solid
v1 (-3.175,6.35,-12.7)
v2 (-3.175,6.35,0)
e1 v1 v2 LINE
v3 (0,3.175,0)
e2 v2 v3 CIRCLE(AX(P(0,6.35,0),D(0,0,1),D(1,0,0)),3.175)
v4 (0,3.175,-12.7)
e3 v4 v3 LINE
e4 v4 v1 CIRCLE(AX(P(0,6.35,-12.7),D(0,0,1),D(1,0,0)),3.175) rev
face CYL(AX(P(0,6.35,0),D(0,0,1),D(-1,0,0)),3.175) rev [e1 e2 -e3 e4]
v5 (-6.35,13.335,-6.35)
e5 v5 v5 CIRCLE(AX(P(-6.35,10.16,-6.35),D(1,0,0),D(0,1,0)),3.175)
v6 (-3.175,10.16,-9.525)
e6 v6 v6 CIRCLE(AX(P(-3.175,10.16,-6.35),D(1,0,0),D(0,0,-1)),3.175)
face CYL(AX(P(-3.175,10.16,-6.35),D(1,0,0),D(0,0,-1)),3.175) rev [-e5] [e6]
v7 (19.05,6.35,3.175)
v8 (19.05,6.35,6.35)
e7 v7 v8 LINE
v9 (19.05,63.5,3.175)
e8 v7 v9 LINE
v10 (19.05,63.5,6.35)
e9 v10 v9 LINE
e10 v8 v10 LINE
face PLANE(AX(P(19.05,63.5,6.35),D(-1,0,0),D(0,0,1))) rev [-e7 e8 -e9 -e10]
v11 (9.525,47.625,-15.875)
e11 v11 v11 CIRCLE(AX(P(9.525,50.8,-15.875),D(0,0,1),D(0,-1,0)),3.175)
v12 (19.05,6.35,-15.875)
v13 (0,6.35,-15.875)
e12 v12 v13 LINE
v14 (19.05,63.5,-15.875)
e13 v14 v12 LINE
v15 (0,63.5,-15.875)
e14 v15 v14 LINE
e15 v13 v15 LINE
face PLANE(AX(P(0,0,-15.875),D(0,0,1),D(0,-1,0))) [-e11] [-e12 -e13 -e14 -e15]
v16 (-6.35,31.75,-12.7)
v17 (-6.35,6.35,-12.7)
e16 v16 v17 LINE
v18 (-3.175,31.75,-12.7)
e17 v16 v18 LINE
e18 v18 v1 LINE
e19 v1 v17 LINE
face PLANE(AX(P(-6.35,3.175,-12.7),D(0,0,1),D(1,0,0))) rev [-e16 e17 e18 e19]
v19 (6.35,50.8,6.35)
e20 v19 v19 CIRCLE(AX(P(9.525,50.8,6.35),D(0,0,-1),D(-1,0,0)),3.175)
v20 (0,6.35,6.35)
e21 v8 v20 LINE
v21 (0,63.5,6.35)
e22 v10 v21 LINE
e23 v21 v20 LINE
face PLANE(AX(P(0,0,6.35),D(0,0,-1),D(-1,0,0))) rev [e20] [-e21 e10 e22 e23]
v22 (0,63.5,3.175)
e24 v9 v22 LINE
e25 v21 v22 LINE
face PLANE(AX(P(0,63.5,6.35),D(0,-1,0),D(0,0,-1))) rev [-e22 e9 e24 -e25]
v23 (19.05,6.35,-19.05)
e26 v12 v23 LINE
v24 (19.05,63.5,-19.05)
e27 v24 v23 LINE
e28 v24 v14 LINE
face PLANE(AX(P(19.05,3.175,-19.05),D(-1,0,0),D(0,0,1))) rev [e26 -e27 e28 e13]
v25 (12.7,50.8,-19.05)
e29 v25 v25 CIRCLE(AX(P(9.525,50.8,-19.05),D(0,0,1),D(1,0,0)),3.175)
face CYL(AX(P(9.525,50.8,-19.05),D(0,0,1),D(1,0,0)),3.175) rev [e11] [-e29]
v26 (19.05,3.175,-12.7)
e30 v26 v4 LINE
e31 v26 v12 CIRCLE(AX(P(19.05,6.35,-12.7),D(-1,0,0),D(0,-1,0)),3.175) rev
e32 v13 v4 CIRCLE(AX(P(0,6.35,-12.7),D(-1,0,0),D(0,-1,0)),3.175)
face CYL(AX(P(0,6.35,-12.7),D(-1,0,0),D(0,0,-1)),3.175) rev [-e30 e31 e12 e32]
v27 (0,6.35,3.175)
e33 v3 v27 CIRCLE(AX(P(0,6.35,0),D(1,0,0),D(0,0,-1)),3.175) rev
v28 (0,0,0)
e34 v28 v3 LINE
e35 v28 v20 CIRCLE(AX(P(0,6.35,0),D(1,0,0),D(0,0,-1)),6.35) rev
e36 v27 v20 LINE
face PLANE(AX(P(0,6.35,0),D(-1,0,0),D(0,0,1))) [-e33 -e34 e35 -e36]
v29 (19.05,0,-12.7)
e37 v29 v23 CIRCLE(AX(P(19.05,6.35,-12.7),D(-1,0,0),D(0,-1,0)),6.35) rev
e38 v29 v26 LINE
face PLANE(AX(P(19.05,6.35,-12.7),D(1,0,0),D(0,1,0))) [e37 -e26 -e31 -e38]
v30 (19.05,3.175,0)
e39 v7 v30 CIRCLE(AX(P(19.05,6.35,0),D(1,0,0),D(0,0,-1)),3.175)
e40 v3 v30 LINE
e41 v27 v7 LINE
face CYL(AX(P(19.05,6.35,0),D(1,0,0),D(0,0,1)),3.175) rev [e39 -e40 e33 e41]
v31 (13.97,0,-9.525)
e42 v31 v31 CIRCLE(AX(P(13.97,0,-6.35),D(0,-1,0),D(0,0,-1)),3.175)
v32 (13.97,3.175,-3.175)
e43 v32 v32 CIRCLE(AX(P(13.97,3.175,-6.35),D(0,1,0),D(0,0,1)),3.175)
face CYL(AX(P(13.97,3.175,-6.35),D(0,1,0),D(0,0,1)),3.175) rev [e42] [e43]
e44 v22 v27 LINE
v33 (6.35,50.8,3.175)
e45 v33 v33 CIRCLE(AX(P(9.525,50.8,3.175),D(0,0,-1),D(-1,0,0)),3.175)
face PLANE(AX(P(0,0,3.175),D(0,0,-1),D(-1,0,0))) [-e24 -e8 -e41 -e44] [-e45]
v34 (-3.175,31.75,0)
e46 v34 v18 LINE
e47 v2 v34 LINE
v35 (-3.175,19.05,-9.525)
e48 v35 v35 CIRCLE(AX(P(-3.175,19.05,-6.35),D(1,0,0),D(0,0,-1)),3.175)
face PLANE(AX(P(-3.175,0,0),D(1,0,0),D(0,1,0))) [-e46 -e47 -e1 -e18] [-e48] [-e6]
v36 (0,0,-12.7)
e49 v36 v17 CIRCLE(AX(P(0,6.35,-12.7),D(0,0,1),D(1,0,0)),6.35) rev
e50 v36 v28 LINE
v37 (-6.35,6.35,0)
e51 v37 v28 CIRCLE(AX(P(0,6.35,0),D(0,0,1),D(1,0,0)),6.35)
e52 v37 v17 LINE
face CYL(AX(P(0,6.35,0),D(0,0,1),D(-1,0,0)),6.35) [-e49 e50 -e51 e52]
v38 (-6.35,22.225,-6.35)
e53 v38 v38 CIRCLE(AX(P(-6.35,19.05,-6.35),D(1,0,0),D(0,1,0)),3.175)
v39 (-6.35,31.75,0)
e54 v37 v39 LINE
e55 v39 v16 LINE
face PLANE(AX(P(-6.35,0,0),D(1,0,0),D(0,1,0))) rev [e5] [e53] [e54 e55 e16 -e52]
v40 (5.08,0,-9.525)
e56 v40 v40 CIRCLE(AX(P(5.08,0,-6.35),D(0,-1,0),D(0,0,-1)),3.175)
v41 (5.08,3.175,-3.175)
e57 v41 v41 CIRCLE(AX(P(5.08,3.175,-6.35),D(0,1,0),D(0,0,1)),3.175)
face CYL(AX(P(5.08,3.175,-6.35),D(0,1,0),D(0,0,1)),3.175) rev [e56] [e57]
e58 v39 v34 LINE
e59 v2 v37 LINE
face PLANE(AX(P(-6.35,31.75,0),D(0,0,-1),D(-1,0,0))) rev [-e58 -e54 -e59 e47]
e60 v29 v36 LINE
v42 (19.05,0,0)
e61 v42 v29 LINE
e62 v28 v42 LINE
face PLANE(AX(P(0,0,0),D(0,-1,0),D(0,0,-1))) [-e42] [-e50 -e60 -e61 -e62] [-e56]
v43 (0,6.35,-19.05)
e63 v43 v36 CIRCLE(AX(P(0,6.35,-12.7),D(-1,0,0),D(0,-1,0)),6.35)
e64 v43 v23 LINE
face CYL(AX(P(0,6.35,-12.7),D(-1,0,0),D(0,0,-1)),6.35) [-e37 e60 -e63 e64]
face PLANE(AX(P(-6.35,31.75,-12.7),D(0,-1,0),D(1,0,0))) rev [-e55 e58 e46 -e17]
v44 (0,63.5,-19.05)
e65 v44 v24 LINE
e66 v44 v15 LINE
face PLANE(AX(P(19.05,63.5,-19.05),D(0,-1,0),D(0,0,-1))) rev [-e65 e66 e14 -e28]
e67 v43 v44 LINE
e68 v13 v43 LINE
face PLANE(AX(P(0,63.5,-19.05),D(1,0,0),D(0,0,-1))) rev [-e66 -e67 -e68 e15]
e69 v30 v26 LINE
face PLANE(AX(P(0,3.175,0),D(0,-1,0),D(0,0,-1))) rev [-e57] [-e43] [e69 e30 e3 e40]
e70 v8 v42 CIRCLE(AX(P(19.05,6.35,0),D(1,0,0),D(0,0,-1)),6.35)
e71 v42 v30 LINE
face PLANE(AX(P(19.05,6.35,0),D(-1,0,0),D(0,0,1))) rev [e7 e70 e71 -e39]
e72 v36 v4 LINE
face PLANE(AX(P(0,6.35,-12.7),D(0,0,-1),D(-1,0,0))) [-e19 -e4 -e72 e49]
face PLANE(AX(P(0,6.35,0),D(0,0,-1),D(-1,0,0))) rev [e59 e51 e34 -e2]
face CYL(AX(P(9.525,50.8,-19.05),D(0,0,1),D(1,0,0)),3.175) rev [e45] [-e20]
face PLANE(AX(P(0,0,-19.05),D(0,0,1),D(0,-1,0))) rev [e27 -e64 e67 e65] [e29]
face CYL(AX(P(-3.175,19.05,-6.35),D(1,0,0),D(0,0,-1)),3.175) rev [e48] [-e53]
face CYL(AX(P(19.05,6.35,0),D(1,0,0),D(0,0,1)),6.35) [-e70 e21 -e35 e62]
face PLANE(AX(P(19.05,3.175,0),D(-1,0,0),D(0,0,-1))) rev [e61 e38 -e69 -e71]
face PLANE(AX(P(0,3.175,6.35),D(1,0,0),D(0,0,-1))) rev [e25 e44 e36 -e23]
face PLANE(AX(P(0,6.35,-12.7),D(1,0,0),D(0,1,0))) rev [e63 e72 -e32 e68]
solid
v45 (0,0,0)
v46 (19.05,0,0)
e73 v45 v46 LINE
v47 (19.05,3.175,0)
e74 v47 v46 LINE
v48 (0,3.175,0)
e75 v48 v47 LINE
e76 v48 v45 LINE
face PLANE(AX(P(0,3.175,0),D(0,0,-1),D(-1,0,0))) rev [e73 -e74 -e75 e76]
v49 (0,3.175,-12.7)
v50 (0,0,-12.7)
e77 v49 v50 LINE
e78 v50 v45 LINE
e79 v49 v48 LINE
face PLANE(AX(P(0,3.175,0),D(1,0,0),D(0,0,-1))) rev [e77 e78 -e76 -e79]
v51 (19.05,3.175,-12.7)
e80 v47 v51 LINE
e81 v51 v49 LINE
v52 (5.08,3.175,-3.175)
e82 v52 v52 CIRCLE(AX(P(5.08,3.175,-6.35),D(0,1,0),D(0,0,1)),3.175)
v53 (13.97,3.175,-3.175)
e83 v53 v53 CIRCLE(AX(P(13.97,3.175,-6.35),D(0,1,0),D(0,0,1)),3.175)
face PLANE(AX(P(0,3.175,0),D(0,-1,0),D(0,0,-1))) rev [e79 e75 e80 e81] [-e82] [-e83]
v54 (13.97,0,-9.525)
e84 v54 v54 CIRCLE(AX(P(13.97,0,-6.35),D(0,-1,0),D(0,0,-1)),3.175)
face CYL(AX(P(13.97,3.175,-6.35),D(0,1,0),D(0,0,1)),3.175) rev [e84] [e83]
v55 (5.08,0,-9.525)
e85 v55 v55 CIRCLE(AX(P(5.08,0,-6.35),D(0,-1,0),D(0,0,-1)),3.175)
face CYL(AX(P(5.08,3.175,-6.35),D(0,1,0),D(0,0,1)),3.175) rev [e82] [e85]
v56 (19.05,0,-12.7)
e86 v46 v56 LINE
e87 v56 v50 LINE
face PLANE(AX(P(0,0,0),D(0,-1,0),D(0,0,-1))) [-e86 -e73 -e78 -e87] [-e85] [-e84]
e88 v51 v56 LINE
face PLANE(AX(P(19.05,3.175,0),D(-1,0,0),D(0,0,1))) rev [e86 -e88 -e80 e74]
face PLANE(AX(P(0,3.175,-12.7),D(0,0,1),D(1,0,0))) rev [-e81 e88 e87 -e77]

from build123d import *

# Parameters (mm, degrees)
SKETCH1_W                            = 19.05
SKETCH1_H                            = 12.7
BOSS_EXTRUDE1_DEPTH                  = 3.175
CONVERT_SOLID3_OUTLINE_W             = 3.175
CONVERT_SOLID3_OUTLINE_H             = 12.7
CONVERT_SOLID3_DEPTH                 = 19.05
EDGE_FLANGE1_DEPTH                   = 19.05
EDGE_FLANGE1_BEND_DEPTH              = 19.05
EDGE_FLANGE3_DEPTH                   = 12.7
CUT_EXTRUDE1_DEPTH                   = 71.995158286
CUT_EXTRUDE1_DEPTH_BACK              = 71.995158286
SKETCH23_R                           = 3.175
F_1_4_0_25_DIAMETER_HOLE1_AT_2_COUNT = 2
F_1_4_0_25_DIAMETER_HOLE1_AT_2_PITCH = 8.89
F_1_4_0_25_DIAMETER_HOLE2_AT_2_COUNT = 2
F_1_4_0_25_DIAMETER_HOLE2_AT_2_PITCH = 8.89


# Read off the part's stored shape, not the designer's step: Convert-Solid3
# Sheet-metal steps are written as plain solids
with BuildPart() as part:
    # Sketch1 → Boss-Extrude1 (new body)
    with BuildSketch(Plane(origin=(0, 0, 0), x_dir=(1, 0, 0), z_dir=(0, 1, 0))):
        with Locations((9.525, 6.35)):
            Rectangle(SKETCH1_W, SKETCH1_H)
    extrude(amount=BOSS_EXTRUDE1_DEPTH)


with BuildPart() as body_2:
    # Convert-Solid3 outline → Convert-Solid3 (new body)
    with BuildSketch(Plane.YZ):
        with Locations((1.5875, -6.35)):
            Rectangle(CONVERT_SOLID3_OUTLINE_W, CONVERT_SOLID3_OUTLINE_H)
    extrude(amount=CONVERT_SOLID3_DEPTH)

    # Edge-Flange1 section (across the edge) → Edge-Flange1 (add)
    with BuildSketch(Plane(origin=(19.05, 3.175, -15.875), x_dir=(0, 0, 1), z_dir=(-1, 0, 0))):
        with BuildLine():
            Line((-3.175, 3.175), (-3.175, 60.325))
            Line((-3.175, 60.325), (0, 60.325))
            Line((0, 60.325), (0, 3.175))
            ThreePointArc((0, 3.175), (0.92993597, 0.92993597), (3.175, 0))
            Line((3.175, 0), (3.175, -3.175))
            ThreePointArc((3.175, -3.175), (-1.315128061, -1.315128061), (-3.175, 3.175))
        make_face()
    extrude(amount=EDGE_FLANGE1_DEPTH)

    # Edge-Flange1 section 2 (across the edge) → Edge-Flange1 bend (add)
    with BuildSketch(Plane(origin=(0, 3.175, 3.175), x_dir=(0, 0, -1), z_dir=(1, 0, 0))):
        with BuildLine():
            Line((-3.175, 3.175), (-3.175, 60.325))
            Line((-3.175, 60.325), (0, 60.325))
            Line((0, 60.325), (0, 3.175))
            ThreePointArc((0, 3.175), (0.92993597, 0.92993597), (3.175, 0))
            Line((3.175, 0), (3.175, -3.175))
            ThreePointArc((3.175, -3.175), (-1.315128061, -1.315128061), (-3.175, 3.175))
        make_face()
    extrude(amount=EDGE_FLANGE1_BEND_DEPTH)

    # Edge-Flange3 section (across the edge) → Edge-Flange3 (add)
    with BuildSketch(Plane(origin=(-3.175, 3.175, -12.7), x_dir=(1, 0, 0), z_dir=(0, 0, 1))):
        with BuildLine():
            Line((-3.175, 3.175), (-3.175, 28.575))
            Line((-3.175, 28.575), (0, 28.575))
            Line((0, 28.575), (0, 3.175))
            ThreePointArc((0, 3.175), (0.92993597, 0.92993597), (3.175, 0))
            Line((3.175, 0), (3.175, -3.175))
            ThreePointArc((3.175, -3.175), (-1.315128061, -1.315128061), (-3.175, 3.175))
        make_face()
    extrude(amount=EDGE_FLANGE3_DEPTH)

    # Sketch23 → Cut-Extrude1 (cut, two sides: drawn at the far end of the back side and taken through both)
    with BuildSketch(Plane.XY.offset(6.35).offset(-CUT_EXTRUDE1_DEPTH_BACK)):
        with Locations(Location((9.525, 50.8, 0), (0, 0, 180))):
            Circle(SKETCH23_R)
    extrude(amount=CUT_EXTRUDE1_DEPTH + CUT_EXTRUDE1_DEPTH_BACK, mode=Mode.SUBTRACT)


with BuildPart() as f_1_4_0_25_diameter_hole1_tool:
    # Sketch25 → 1/4 (0.25) Diameter Hole1 (revolve)
    with BuildSketch(Plane(origin=(5.08, 3.175, -6.35), x_dir=(0, 0, 1), z_dir=(1, 0, 0))):
        Polygon((0, 0), (0, 18.417732465), (3.175, 16.51), (3.175, 0), align=None)
    f_1_4_0_25_diameter_hole1 = revolve(axis=Axis((5.08, 9.525, -6.35), (0, -1, 0)))


with BuildPart() as part_1:
    add(part.part)

    # 1/4 (0.25) Diameter Hole1: cut by f_1_4_0_25_diameter_hole1_tool
    add(f_1_4_0_25_diameter_hole1_tool.part, mode=Mode.SUBTRACT)


with BuildPart() as body_2_1:
    add(body_2.part)

    # 1/4 (0.25) Diameter Hole1: cut by f_1_4_0_25_diameter_hole1_tool
    add(f_1_4_0_25_diameter_hole1_tool.part, mode=Mode.SUBTRACT)


with BuildPart() as f_1_4_0_25_diameter_hole1_at_2_tool:
    # 1/4 (0.25) Diameter Hole1 at 2: 1/4 (0.25) Diameter Hole1 ×2
    with Locations(*[(i * F_1_4_0_25_DIAMETER_HOLE1_AT_2_PITCH, 0, 0) for i in range(1, F_1_4_0_25_DIAMETER_HOLE1_AT_2_COUNT)]):
        add(f_1_4_0_25_diameter_hole1)


with BuildPart() as part_2:
    add(part_1.part)

    # 1/4 (0.25) Diameter Hole1 at 2: cut by f_1_4_0_25_diameter_hole1_at_2_tool
    add(f_1_4_0_25_diameter_hole1_at_2_tool.part, mode=Mode.SUBTRACT)


with BuildPart() as body_2_2:
    add(body_2_1.part)

    # 1/4 (0.25) Diameter Hole1 at 2: cut by f_1_4_0_25_diameter_hole1_at_2_tool
    add(f_1_4_0_25_diameter_hole1_at_2_tool.part, mode=Mode.SUBTRACT)

    # Sketch38 → 1/4 (0.25) Diameter Hole2 (revolve, cut)
    with BuildSketch(Plane(origin=(-3.175, 10.16, -6.35), x_dir=(0, 0, -1), z_dir=(0, 1, 0))):
        Polygon((0, 0), (0, 18.417732465), (3.175, 16.51), (3.175, 0), align=None)
    f_1_4_0_25_diameter_hole2 = revolve(axis=Axis((3.175, 10.16, -6.35), (-1, 0, 0)), mode=Mode.SUBTRACT)

    # 1/4 (0.25) Diameter Hole2 at 2: 1/4 (0.25) Diameter Hole2 ×2
    with Locations(*[(0, i * F_1_4_0_25_DIAMETER_HOLE2_AT_2_PITCH, 0) for i in range(1, F_1_4_0_25_DIAMETER_HOLE2_AT_2_COUNT)]):
        add(f_1_4_0_25_diameter_hole2, mode=Mode.SUBTRACT)


solid = Compound([part_2.part, body_2_2.part])
